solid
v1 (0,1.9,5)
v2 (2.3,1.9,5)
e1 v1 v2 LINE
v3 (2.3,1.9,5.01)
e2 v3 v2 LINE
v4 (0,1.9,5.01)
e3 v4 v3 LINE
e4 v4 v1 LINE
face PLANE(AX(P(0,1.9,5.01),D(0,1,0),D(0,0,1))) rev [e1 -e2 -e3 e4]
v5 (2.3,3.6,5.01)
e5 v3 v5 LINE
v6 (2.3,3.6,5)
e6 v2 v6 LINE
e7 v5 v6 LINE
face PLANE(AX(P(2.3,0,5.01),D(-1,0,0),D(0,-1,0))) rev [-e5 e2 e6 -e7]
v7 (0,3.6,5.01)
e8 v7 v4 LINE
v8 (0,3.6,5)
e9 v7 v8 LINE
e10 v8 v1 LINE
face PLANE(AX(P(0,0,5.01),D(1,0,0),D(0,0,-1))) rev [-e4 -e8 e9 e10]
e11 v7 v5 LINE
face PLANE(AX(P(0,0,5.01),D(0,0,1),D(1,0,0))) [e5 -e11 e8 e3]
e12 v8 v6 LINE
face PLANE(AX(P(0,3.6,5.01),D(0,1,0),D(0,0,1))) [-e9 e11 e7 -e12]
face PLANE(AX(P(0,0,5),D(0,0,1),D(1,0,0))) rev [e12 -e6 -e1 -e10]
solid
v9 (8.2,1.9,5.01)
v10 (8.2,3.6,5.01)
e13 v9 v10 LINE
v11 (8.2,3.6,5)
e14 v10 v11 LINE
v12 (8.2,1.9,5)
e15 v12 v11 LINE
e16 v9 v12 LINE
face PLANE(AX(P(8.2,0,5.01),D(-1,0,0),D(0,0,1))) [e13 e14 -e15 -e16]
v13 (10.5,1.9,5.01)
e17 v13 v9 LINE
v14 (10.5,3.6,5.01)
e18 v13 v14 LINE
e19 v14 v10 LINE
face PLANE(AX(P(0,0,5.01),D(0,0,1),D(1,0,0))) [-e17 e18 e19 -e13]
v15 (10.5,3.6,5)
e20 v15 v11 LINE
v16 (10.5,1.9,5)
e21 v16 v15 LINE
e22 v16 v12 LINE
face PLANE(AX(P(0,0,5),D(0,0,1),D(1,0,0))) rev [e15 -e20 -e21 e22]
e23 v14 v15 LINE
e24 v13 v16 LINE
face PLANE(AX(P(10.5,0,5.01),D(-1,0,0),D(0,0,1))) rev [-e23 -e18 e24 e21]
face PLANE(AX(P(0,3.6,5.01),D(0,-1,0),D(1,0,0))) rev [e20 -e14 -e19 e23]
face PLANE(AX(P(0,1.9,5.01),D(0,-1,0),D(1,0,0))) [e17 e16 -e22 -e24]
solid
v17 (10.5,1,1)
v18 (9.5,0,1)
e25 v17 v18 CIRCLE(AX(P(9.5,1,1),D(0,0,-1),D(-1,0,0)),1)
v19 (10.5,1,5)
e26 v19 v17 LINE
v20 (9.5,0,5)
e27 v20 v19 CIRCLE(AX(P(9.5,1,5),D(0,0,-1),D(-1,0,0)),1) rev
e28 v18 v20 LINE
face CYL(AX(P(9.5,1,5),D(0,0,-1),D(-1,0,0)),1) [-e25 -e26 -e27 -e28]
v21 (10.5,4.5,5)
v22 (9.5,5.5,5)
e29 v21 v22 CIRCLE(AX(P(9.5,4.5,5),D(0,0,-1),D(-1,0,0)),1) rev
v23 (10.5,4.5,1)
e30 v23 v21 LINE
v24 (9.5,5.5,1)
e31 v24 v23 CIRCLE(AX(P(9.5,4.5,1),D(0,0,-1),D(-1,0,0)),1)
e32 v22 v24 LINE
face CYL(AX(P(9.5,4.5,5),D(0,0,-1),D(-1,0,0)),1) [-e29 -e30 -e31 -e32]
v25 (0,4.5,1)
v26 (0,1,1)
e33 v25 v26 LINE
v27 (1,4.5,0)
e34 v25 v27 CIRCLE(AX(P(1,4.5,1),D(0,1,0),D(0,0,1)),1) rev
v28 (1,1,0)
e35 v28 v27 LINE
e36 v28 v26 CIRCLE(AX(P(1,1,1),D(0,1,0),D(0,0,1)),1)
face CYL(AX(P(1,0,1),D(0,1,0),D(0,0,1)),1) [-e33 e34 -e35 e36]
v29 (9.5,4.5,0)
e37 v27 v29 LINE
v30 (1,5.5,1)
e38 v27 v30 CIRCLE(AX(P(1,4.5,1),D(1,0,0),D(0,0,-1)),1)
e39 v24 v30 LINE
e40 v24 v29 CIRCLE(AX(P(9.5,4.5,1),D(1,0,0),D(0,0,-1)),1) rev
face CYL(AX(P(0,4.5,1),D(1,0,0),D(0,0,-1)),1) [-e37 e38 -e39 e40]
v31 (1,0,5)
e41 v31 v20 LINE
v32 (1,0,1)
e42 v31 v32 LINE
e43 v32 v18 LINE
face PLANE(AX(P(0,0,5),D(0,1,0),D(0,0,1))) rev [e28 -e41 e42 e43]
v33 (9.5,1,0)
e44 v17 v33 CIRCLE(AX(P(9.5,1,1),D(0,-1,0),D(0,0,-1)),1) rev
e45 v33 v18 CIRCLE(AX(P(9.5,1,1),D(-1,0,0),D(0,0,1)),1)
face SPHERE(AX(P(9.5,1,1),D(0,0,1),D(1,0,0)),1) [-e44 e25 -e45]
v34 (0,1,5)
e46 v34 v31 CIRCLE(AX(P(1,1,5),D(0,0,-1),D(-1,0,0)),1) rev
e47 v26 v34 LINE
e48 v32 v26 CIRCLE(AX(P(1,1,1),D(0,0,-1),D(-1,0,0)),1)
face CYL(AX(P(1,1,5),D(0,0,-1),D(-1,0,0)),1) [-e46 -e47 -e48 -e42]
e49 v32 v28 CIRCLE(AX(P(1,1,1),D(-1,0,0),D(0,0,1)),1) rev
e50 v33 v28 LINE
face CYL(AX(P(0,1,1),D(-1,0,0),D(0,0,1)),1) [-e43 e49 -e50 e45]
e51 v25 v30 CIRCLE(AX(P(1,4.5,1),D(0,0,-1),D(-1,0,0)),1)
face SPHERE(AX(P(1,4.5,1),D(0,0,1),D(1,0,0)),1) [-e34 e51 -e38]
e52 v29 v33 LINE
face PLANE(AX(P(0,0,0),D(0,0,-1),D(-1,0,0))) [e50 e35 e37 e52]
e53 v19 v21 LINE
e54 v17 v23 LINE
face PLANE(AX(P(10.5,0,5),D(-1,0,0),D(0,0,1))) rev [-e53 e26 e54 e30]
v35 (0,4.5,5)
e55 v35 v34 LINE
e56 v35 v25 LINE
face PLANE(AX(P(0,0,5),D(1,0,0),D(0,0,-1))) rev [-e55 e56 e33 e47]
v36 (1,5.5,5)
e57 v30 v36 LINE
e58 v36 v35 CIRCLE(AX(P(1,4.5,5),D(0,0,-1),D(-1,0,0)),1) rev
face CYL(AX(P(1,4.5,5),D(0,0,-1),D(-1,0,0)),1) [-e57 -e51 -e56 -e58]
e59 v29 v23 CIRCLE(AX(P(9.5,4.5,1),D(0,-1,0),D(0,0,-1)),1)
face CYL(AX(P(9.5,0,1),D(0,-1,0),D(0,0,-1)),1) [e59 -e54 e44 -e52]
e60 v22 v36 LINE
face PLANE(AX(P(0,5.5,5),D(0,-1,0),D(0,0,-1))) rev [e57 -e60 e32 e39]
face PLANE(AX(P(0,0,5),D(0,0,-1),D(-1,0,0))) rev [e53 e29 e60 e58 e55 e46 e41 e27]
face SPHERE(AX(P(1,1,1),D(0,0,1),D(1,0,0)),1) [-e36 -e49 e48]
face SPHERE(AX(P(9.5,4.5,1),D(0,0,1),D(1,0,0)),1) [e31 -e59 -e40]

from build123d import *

# Parameters (mm, degrees)
SKETCH1_W           = 10.5
SKETCH1_H           = 5.5
BOSS_EXTRUDE1_DEPTH = 5
SKETCH2_W           = 2.3
SKETCH2_H           = 0.85
BOSS_EXTRUDE2_DEPTH = 0.01
FILLET1_R           = 1
FILLET2_R           = 1


with BuildPart() as part:
    # Sketch1 → Boss-Extrude1 (new body)
    with BuildSketch(Plane.XY):
        with Locations((5.25, 2.75)):
            Rectangle(SKETCH1_W, SKETCH1_H)
    extrude(amount=BOSS_EXTRUDE1_DEPTH)

    # Fillet1
    fillet1_edges = [part.edges().sort_by_distance(p)[0] for p in [
        (5.25, 5.5, 0),
        (10.5, 2.75, 0),
        (5.25, 0, 0),
        (0, 2.75, 0),
    ]]
    fillet(fillet1_edges, radius=FILLET1_R)

    # Fillet2
    # the kernel refuses this fillet: 1 mm, written as the material it takes off along each edge
    with BuildSketch(Plane(origin=(9.5, 4.5, 1), x_dir=(0, 1, 0), z_dir=(1, 0, 0))) as fillet2_piece_1_section:
        Polygon((0, 0), (FILLET2_R, 0), (FILLET2_R, -FILLET2_R), (0, -FILLET2_R), align=None)
    fillet2_piece_1 = extrude(amount=FILLET2_R, mode=Mode.PRIVATE)
    fillet2_piece_1 = fillet2_piece_1 - Plane(origin=(9.5, 4.5, 1), x_dir=(0, -0.7071067811865475, 0.7071067811865475), z_dir=(1, 0, 0)) * Sphere(FILLET2_R, mode=Mode.PRIVATE)
    add(fillet2_piece_1, mode=Mode.SUBTRACT)
    with BuildSketch(Plane(origin=(9.5, 1, 1), x_dir=(1, 0, 0), z_dir=(0, -1, 0))) as fillet2_piece_2_section:
        Polygon((0, 0), (FILLET2_R, 0), (FILLET2_R, -FILLET2_R), (0, -FILLET2_R), align=None)
    fillet2_piece_2 = extrude(amount=FILLET2_R, mode=Mode.PRIVATE)
    fillet2_piece_2 = fillet2_piece_2 - Plane(origin=(9.5, 1, 1), x_dir=(-0.7071067811865475, 0, 0.7071067811865475), z_dir=(0, -1, 0)) * Sphere(FILLET2_R, mode=Mode.PRIVATE)
    add(fillet2_piece_2, mode=Mode.SUBTRACT)
    with BuildSketch(Plane(origin=(1, 4.5, 1), x_dir=(0, 1, 0), z_dir=(-1, 0, 0))) as fillet2_piece_3_section:
        Polygon((0, 0), (FILLET2_R, 0), (FILLET2_R, FILLET2_R), (0, FILLET2_R), align=None)
    fillet2_piece_3 = extrude(amount=FILLET2_R, mode=Mode.PRIVATE)
    fillet2_piece_3 = fillet2_piece_3 - Plane(origin=(1, 4.5, 1), x_dir=(0, -0.7071067811865475, 0.7071067811865475), z_dir=(-1, 0, 0)) * Sphere(FILLET2_R, mode=Mode.PRIVATE)
    add(fillet2_piece_3, mode=Mode.SUBTRACT)
    with BuildSketch(Plane(origin=(1, 1, 1), x_dir=(-1, 0, 0), z_dir=(0, -1, 0))) as fillet2_piece_4_section:
        Polygon((0, 0), (FILLET2_R, 0), (FILLET2_R, FILLET2_R), (0, FILLET2_R), align=None)
    fillet2_piece_4 = extrude(amount=FILLET2_R, mode=Mode.PRIVATE)
    fillet2_piece_4 = fillet2_piece_4 - Plane(origin=(1, 1, 1), x_dir=(0.7071067811865475, 0, 0.7071067811865475), z_dir=(0, -1, 0)) * Sphere(FILLET2_R, mode=Mode.PRIVATE)
    add(fillet2_piece_4, mode=Mode.SUBTRACT)
    with BuildSketch(Plane(origin=(0, 5.5, 1), x_dir=(0, -1, 0), z_dir=(0, 0, 1)), Plane(origin=(0, 0, 1), x_dir=(1, 0, 0), z_dir=(0, 0, 1))) as fillet2_piece_5:
        with BuildLine():
            CenterArc((FILLET2_R, FILLET2_R), FILLET2_R, 180, 90)
            Line((0, FILLET2_R), (0, 0))
            Line((0, 0), (FILLET2_R, 0))
        make_face()
    extrude(amount=6.5, mode=Mode.SUBTRACT)
    with BuildSketch(Plane(origin=(10.5, 5.5, 1), x_dir=(0, -1, 0), z_dir=(0, 0, 1)), Plane(origin=(10.5, 0, 1), x_dir=(-1, 0, 0), z_dir=(0, 0, 1))) as fillet2_piece_6:
        with BuildLine():
            CenterArc((FILLET2_R, -FILLET2_R), FILLET2_R, 90, 90)
            Line((0, -FILLET2_R), (0, 0))
            Line((0, 0), (FILLET2_R, 0))
        make_face()
    extrude(amount=6.5, mode=Mode.SUBTRACT)


with BuildPart() as body_2:
    # Sketch2 → Boss-Extrude2 (new body)
    with BuildSketch(Plane.XY.offset(5)):
        with Locations((1.15, 3.175)):
            Rectangle(SKETCH2_W, SKETCH2_H)
        with Locations((1.15, 2.325)):
            Rectangle(SKETCH2_W, SKETCH2_H)
        with Locations((9.35, 3.175)):
            Rectangle(SKETCH2_W, SKETCH2_H)
        with Locations((9.35, 2.325)):
            Rectangle(SKETCH2_W, SKETCH2_H)
    extrude(amount=BOSS_EXTRUDE2_DEPTH)


solid = Compound([part.part, body_2.part])
